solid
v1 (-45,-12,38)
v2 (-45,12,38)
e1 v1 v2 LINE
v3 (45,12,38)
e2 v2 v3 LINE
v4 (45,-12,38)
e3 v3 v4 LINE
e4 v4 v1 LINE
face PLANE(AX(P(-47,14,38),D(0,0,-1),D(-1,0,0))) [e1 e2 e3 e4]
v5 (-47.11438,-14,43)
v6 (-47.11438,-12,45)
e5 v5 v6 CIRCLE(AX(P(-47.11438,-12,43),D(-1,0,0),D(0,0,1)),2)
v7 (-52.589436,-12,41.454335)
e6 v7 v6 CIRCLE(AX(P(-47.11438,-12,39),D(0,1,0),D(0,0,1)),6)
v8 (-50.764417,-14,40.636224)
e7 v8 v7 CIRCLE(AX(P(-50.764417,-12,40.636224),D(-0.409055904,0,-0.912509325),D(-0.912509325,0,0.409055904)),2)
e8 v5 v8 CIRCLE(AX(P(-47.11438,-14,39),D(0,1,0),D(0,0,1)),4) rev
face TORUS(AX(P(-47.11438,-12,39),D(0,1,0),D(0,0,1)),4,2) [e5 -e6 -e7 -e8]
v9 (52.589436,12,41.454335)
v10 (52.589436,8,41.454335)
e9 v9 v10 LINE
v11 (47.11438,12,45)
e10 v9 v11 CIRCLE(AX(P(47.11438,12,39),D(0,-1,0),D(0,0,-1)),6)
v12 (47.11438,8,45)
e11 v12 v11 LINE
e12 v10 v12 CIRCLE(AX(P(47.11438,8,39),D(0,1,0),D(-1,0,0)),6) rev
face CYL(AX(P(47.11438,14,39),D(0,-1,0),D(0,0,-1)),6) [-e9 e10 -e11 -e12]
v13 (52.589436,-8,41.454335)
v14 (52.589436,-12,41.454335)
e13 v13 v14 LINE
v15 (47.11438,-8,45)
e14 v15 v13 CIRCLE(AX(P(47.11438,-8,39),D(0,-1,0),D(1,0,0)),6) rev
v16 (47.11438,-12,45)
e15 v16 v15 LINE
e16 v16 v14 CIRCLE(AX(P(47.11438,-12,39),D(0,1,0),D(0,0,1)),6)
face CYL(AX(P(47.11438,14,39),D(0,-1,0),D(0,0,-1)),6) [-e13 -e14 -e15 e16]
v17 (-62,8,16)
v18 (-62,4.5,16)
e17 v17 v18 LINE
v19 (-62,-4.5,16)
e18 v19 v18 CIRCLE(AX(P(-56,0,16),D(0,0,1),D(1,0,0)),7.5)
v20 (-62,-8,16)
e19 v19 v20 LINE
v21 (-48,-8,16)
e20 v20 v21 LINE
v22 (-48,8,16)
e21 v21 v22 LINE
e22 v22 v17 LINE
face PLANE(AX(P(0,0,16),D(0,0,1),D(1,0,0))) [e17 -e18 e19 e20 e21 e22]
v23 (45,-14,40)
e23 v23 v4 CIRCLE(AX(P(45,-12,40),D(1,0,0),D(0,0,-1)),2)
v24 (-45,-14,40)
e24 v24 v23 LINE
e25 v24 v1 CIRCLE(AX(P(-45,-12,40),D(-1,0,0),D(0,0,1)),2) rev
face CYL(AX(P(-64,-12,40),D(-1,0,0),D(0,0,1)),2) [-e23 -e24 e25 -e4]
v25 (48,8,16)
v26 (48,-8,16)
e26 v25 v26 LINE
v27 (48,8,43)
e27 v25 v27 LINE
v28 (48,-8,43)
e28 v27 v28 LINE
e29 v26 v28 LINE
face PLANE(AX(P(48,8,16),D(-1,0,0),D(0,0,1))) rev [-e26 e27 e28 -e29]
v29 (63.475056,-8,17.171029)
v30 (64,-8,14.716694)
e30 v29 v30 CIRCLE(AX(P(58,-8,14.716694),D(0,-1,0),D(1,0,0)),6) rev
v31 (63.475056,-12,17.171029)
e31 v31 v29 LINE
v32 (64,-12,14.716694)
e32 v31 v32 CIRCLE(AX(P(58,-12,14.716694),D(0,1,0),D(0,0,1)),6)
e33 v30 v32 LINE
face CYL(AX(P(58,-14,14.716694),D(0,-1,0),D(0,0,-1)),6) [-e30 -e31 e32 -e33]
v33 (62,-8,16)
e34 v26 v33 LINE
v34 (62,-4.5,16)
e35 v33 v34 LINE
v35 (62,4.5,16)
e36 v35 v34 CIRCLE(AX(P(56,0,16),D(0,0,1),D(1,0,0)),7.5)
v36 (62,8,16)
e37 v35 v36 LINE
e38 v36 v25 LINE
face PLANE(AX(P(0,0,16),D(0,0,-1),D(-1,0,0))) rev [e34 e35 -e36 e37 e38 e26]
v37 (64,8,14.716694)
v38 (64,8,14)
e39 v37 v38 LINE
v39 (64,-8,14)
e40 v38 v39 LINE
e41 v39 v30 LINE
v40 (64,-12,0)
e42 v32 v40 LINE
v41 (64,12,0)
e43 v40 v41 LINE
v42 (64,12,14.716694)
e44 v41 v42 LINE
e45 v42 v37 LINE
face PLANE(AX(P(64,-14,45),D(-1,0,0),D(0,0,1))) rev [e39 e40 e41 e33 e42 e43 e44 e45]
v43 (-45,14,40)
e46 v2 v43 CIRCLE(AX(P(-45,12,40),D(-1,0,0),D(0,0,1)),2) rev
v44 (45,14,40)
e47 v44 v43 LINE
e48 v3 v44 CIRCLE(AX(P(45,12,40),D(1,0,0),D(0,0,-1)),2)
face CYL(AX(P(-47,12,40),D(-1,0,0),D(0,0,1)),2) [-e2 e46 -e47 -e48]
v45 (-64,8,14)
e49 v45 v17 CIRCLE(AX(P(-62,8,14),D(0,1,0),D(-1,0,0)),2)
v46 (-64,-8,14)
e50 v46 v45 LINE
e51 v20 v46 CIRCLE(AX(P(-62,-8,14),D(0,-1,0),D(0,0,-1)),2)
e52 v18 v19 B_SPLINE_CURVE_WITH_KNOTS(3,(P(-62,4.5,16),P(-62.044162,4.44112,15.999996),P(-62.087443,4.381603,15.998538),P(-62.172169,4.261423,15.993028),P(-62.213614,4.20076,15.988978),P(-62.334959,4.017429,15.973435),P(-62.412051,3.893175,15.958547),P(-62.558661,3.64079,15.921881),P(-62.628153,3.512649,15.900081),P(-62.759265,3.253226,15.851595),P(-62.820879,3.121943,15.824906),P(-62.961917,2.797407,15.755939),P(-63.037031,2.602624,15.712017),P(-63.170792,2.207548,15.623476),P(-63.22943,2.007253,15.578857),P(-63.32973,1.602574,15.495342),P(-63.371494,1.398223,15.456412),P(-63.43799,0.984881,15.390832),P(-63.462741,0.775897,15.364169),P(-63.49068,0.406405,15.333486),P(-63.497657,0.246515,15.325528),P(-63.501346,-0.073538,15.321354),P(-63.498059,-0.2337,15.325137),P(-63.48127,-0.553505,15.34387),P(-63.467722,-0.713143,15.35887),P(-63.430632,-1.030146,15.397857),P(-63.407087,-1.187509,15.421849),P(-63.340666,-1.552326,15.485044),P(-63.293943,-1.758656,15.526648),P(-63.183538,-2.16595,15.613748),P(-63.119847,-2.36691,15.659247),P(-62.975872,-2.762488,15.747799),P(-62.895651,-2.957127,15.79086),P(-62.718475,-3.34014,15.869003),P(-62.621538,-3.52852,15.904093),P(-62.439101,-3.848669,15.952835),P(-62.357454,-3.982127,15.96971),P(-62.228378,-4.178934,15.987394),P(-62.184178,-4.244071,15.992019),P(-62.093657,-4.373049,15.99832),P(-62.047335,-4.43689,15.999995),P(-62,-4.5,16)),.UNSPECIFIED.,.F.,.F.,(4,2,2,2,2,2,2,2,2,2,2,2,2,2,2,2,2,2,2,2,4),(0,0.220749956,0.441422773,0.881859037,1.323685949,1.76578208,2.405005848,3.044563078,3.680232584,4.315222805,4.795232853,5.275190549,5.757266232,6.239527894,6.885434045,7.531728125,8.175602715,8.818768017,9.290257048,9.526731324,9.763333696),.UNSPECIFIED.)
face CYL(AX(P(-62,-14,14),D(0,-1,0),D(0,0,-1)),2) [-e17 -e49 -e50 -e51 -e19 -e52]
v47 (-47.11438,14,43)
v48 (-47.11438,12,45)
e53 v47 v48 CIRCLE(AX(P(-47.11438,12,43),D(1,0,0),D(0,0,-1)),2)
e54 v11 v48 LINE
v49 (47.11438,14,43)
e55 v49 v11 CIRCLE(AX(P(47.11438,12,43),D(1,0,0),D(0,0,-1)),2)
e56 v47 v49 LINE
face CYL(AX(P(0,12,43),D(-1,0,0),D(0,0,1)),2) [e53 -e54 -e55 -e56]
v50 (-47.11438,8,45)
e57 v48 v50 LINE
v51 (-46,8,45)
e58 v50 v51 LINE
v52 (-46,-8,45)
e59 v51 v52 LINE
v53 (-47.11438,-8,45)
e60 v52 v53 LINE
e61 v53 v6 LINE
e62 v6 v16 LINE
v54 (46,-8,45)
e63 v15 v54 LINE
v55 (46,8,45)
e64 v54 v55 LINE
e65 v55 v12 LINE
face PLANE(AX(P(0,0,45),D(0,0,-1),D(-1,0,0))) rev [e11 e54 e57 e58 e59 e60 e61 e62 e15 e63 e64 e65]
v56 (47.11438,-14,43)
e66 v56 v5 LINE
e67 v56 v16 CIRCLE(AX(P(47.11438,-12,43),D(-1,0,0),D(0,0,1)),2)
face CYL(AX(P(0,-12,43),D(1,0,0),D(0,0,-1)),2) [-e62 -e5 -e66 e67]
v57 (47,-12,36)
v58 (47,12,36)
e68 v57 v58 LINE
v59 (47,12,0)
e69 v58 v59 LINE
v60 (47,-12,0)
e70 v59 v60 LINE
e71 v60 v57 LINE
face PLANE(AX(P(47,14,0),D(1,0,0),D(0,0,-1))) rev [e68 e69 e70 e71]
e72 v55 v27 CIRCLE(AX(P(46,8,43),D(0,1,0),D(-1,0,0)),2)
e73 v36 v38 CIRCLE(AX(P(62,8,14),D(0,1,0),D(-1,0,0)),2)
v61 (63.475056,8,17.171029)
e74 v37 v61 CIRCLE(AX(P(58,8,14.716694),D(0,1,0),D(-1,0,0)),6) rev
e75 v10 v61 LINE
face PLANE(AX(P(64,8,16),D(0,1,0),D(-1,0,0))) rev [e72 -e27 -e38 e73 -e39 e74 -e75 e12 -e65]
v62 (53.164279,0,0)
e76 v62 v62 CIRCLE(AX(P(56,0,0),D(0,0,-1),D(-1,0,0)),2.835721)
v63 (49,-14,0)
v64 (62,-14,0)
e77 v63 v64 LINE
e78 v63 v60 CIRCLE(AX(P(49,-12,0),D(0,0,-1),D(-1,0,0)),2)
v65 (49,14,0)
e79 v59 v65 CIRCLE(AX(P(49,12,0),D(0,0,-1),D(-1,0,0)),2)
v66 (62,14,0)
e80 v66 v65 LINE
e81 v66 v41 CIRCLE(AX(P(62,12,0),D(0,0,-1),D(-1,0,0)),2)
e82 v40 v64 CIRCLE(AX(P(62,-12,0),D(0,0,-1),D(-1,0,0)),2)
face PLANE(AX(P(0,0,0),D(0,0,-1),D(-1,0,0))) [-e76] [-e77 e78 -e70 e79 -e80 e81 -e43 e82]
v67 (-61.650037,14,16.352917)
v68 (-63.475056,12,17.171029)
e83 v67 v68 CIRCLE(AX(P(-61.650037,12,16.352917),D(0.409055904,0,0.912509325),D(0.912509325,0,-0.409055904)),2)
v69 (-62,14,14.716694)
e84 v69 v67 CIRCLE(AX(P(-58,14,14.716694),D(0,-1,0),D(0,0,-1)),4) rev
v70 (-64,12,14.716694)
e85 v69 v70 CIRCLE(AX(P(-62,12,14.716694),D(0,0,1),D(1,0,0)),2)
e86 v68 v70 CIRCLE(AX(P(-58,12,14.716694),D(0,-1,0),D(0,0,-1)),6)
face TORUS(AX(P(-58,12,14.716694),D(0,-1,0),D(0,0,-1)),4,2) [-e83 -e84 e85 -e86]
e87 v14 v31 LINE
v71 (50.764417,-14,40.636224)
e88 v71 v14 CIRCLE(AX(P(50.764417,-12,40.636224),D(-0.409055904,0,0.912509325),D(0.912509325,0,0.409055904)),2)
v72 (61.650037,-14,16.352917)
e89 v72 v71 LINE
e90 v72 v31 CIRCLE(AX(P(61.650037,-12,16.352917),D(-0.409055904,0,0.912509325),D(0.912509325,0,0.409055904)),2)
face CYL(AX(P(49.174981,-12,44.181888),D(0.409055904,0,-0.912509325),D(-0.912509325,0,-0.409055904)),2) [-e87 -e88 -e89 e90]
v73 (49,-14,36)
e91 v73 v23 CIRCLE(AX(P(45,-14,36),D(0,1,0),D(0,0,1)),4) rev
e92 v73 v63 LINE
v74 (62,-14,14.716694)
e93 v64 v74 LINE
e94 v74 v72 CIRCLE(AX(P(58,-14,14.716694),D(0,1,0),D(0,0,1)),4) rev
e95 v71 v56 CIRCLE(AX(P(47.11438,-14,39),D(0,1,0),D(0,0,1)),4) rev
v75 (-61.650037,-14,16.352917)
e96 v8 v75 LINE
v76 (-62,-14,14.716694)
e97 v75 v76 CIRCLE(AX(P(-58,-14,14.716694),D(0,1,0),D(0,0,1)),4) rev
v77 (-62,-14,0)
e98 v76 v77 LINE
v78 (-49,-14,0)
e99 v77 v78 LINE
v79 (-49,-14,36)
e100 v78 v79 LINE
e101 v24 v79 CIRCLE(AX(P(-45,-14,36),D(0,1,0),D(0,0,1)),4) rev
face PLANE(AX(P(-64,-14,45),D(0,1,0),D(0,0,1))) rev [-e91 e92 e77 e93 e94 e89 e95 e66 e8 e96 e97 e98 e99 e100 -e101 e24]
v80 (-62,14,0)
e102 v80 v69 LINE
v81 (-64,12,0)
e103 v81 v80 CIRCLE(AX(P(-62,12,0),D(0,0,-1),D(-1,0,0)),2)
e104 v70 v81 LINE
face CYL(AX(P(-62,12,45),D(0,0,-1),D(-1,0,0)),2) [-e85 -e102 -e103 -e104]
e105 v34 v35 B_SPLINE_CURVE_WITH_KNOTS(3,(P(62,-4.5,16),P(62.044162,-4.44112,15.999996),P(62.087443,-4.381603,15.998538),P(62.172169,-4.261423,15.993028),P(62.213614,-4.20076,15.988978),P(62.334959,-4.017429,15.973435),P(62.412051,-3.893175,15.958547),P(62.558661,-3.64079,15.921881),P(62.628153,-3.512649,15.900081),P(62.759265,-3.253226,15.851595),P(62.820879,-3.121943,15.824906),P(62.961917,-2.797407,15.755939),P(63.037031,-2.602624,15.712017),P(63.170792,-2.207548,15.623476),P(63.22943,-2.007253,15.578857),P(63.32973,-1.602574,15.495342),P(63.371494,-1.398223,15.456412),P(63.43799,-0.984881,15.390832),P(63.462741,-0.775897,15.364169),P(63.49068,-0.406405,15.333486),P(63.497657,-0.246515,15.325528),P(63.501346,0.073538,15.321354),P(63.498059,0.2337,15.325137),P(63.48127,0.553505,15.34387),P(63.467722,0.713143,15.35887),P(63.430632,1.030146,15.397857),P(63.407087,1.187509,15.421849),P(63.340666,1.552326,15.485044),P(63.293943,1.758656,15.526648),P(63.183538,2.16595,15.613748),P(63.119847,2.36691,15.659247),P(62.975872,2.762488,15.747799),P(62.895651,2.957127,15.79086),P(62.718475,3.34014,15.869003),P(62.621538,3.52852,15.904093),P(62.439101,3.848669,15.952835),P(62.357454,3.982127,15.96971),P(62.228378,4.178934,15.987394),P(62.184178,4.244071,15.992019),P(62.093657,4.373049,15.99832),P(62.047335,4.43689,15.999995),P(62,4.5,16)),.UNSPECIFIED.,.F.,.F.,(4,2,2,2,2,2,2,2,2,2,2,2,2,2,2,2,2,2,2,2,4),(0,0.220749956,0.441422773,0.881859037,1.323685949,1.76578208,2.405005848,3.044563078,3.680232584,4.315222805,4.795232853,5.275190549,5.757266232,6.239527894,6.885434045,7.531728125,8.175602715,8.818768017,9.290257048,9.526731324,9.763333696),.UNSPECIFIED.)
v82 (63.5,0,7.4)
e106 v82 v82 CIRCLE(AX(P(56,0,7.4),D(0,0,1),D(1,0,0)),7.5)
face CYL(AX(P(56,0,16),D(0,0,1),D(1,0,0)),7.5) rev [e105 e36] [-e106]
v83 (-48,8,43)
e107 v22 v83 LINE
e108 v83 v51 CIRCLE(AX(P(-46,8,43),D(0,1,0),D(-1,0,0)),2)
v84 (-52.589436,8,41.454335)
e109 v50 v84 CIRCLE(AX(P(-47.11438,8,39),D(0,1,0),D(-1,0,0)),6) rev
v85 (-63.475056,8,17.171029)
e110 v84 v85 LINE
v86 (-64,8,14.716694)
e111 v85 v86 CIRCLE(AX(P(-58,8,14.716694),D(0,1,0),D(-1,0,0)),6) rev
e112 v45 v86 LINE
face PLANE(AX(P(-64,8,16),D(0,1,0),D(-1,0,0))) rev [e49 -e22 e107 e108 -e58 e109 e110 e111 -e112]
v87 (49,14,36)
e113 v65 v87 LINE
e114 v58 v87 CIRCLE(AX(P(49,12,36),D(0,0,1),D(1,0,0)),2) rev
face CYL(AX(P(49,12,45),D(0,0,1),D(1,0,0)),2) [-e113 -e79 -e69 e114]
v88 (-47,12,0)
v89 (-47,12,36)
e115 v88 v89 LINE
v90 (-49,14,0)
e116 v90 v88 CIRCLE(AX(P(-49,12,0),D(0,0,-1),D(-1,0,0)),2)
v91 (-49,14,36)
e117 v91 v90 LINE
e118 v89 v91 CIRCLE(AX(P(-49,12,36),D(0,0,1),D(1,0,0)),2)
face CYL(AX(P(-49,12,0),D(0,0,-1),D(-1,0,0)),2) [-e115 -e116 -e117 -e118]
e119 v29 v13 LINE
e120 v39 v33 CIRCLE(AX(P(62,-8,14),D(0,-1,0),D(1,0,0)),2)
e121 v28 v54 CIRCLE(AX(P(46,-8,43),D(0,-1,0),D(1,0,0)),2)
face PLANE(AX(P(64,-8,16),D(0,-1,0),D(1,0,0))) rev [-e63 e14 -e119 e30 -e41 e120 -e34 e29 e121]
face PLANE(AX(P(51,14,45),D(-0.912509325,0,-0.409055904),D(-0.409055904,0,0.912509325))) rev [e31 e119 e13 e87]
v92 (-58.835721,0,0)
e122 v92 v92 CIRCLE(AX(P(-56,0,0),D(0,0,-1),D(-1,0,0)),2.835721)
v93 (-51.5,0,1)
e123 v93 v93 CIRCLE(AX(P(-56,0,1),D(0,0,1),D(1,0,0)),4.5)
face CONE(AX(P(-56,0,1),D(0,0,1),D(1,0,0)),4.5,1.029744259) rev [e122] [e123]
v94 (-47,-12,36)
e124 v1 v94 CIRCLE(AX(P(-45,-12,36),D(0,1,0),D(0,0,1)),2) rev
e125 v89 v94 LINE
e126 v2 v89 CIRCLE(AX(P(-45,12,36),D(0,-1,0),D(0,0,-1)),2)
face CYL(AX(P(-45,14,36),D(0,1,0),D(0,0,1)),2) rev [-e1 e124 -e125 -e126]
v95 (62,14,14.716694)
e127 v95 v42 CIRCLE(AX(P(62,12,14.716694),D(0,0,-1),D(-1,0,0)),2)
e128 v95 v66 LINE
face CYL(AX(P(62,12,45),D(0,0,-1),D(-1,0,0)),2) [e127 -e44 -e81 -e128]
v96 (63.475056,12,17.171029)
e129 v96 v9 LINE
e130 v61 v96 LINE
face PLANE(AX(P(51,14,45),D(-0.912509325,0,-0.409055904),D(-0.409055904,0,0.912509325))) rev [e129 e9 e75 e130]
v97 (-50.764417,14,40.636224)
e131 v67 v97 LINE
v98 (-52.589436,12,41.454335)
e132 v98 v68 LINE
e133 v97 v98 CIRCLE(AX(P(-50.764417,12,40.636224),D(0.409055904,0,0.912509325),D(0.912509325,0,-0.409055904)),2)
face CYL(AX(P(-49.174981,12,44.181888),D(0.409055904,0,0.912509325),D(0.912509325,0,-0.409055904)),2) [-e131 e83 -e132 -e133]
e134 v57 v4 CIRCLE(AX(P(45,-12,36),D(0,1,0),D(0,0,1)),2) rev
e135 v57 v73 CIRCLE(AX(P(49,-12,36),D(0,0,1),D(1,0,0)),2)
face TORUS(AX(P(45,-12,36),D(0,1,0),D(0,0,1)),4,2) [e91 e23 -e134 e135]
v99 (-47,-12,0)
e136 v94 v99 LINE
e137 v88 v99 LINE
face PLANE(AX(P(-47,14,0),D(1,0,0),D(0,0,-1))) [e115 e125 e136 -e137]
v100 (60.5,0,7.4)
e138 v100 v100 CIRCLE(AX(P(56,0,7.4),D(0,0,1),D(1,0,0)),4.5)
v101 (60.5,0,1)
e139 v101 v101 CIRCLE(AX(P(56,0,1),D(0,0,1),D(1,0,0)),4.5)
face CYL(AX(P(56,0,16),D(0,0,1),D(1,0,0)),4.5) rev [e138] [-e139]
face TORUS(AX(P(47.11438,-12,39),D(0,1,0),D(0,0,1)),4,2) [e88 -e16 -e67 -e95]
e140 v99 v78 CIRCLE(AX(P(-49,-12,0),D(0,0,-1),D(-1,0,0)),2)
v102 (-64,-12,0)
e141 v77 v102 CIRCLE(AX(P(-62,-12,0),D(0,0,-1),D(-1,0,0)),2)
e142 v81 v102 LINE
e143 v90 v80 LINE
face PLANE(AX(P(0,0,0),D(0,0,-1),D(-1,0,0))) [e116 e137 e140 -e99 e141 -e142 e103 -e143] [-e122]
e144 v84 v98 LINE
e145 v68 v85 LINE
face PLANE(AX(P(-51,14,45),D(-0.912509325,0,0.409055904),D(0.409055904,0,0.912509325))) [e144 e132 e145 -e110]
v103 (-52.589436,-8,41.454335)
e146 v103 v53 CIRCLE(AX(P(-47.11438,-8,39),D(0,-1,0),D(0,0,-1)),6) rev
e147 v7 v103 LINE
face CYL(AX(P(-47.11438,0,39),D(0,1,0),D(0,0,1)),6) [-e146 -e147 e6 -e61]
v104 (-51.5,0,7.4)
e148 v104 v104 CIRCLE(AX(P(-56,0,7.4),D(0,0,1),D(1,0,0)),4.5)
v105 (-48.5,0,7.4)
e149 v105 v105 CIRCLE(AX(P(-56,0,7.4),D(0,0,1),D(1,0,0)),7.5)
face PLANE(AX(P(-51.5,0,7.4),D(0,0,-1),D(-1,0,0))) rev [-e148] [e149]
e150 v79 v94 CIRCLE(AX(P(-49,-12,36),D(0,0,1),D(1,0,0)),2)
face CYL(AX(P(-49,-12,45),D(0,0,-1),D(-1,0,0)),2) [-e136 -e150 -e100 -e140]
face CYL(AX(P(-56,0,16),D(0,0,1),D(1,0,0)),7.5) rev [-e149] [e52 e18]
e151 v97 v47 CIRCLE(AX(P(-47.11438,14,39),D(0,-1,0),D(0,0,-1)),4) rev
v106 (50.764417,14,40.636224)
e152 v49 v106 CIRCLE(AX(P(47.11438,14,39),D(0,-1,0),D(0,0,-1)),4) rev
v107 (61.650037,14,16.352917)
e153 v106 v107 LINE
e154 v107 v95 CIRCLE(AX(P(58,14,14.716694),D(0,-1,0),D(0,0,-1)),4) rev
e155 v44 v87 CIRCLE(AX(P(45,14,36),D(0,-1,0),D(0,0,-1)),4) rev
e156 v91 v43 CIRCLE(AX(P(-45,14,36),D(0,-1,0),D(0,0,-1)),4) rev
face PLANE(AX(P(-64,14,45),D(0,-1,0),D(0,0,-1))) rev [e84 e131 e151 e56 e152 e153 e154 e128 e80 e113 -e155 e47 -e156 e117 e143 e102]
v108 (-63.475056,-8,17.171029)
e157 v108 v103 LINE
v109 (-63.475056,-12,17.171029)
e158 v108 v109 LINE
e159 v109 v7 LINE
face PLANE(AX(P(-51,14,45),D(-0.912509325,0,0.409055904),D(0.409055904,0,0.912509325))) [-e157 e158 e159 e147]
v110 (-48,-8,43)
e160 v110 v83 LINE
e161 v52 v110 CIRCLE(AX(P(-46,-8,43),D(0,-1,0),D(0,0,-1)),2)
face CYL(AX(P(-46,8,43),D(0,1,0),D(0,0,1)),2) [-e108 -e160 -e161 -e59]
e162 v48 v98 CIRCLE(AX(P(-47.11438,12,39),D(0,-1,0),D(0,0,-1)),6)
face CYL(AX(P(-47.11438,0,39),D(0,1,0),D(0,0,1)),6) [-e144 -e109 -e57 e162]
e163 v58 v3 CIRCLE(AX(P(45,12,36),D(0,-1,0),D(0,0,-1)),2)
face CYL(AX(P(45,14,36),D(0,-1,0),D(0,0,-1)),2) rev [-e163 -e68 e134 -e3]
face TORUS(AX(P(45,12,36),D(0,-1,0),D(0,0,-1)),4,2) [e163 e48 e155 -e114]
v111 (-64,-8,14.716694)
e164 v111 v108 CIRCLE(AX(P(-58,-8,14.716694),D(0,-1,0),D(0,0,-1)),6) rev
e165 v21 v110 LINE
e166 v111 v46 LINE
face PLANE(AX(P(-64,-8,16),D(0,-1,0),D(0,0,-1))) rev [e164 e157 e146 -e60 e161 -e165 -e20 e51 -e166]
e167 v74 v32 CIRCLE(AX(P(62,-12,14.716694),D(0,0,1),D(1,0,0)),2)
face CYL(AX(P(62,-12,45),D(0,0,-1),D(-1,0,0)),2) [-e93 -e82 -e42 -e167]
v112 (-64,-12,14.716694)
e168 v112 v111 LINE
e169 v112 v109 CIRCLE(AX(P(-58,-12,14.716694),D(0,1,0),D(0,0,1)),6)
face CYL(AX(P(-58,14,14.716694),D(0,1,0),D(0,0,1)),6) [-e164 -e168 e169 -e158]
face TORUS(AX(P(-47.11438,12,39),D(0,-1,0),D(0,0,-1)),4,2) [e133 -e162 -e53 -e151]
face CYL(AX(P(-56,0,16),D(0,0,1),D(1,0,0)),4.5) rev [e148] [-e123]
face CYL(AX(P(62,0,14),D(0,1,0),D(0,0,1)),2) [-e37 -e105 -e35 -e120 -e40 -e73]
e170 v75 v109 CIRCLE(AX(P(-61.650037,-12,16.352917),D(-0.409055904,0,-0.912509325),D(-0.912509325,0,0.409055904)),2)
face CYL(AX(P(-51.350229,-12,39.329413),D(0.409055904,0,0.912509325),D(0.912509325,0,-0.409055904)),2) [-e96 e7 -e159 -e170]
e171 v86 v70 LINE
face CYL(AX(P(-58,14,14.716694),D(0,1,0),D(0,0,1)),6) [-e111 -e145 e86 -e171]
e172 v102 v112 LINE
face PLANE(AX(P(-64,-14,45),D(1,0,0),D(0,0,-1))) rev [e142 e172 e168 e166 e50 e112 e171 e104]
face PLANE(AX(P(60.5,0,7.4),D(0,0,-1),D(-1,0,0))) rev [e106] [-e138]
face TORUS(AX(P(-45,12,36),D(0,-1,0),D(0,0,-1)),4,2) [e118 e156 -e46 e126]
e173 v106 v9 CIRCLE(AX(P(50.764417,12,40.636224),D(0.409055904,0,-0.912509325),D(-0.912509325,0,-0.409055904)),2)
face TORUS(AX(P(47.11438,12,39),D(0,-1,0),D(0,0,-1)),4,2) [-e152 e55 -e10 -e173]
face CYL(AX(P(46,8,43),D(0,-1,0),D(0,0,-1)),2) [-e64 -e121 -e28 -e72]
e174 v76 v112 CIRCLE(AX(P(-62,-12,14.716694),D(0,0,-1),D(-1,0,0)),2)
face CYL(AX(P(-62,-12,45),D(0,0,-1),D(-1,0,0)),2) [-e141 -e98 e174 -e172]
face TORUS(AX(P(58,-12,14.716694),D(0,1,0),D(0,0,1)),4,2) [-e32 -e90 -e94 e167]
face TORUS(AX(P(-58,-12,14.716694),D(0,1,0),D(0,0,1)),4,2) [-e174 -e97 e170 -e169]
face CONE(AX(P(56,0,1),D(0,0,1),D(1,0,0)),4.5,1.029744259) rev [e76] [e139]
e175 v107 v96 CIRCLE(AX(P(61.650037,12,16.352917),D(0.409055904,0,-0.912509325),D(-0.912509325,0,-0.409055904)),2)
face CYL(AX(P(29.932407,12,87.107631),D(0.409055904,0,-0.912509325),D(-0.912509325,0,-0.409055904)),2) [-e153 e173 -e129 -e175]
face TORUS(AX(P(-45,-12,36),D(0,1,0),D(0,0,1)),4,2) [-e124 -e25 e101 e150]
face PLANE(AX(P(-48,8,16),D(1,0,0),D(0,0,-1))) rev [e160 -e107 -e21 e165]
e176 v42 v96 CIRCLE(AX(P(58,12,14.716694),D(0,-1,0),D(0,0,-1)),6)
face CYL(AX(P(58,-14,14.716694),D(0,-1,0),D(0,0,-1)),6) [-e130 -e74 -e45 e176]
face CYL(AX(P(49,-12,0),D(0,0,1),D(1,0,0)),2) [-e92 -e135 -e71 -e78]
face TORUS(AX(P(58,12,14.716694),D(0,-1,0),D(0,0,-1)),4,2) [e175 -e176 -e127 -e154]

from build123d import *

# Parameters (mm, degrees)
SKETCH1_W                                           = 128
SKETCH1_H                                           = 28
BOSS_EXTRUDE1_DEPTH                                 = 45
SKETCH2_OUTSIDE_W                                   = 157.708
SKETCH2_OUTSIDE_H                                   = 74.708
CUT_EXTRUDE2_DEPTH                                  = 84.096329642
FILLET1_R                                           = 6
FILLET2_R                                           = 2
SKETCH3_W                                           = 16
SKETCH3_H                                           = 16
CUT_EXTRUDE3_DEPTH                                  = 29
FILLET3_R                                           = 2
CBORE_FOR_M8_HEX_SOCKET_HEAD_CAP_SCREW1_D           = 9
CBORE_FOR_M8_HEX_SOCKET_HEAD_CAP_SCREW1_DEPTH       = 15
CBORE_FOR_M8_HEX_SOCKET_HEAD_CAP_SCREW1_CBORE_D     = 15
CBORE_FOR_M8_HEX_SOCKET_HEAD_CAP_SCREW1_CBORE_DEPTH = 8.6
CBORE_FOR_M8_HEX_SOCKET_HEAD_CAP_SCREW1_TIP         = 2.703872786


with BuildPart() as part:
    # Sketch1 → Boss-Extrude1 (new body)
    with BuildSketch(Plane.XY):
        Rectangle(SKETCH1_W, SKETCH1_H)
    extrude(amount=BOSS_EXTRUDE1_DEPTH)

    # Sketch2 outside → Cut-Extrude2 (cut, through all)
    with BuildSketch(Plane.XZ.offset(14)):
        with Locations((0, 22.5)):
            Rectangle(SKETCH2_OUTSIDE_W, SKETCH2_OUTSIDE_H)
        Polygon((-47, 0), (-47, 38), (47, 38), (47, 0), (64, 0), (64, 16), (51, 45), (-51, 45), (-64, 16), (-64, 0), align=None, mode=Mode.SUBTRACT)
    extrude(amount=-CUT_EXTRUDE2_DEPTH, mode=Mode.SUBTRACT)

    # Fillet1
    fillet1_edges = [part.edges().sort_by_distance(p)[0] for p in [
        (-64, 0, 16),
        (-51, 0, 45),
        (51, 0, 45),
        (64, 0, 16),
    ]]
    fillet(fillet1_edges, radius=FILLET1_R)

    # Fillet2
    fillet2_edges = [part.edges().sort_by_distance(p)[0] for p in [
        (-47, 14, 19),
        (0, 14, 38),
        (47, -14, 19),
        (47, 14, 19),
        (47, 0, 38),
        (0, -14, 38),
        (-47, 0, 38),
        (-47, -14, 19),
        (0, -14, 45),
        (0, 14, 45),
        (-58.032245896, -14, 29.312682233),
        (-64, -14, 7.358346808),
        (64, -14, 7.358346808),
        (58.032245896, -14, 29.312682233),
        (63.867296468, -14, 15.971616785),
        (50.375820334, -14, 44.036169802),
        (-63.867296468, -14, 15.971616785),
        (-50.375820334, -14, 44.036169802),
        (-58.032245896, 14, 29.312682233),
        (58.032245896, 14, 29.312682233),
        (64, 14, 7.358346808),
        (-64, 14, 7.358346808),
        (63.867296468, 14, 15.971616785),
        (50.375820334, 14, 44.036169802),
        (-63.867296468, 14, 15.971616785),
        (-50.375820334, 14, 44.036169802),
    ]]
    fillet(fillet2_edges, radius=FILLET2_R)

    # Sketch3 → Cut-Extrude3 (cut)
    with BuildSketch(Plane.XY.offset(45)):
        with Locations((-56, 0)):
            Rectangle(SKETCH3_W, SKETCH3_H)
        with Locations((56, 0)):
            Rectangle(SKETCH3_W, SKETCH3_H)
    extrude(amount=-CUT_EXTRUDE3_DEPTH, mode=Mode.SUBTRACT)

    # Fillet3
    # the kernel refuses this fillet: 2 mm, written as the material it takes off along each edge
    with BuildSketch(Plane(origin=(63.861153873, -8, 16), x_dir=(0.06925637128898768, 0, -0.9975988948650063), z_dir=(0, 1, 0))) as fillet3_piece_1:
        with BuildLine():
            CenterArc((1.866301026, 1.99519779), FILLET3_R, 183.971276773, 90)
            Line((-0.128896764, 1.856685047), (-0.328416543, 1.842833773))
            Line((-0.328416543, 1.842833773), (-0.199519779, -0.013851274))
            Line((-0.199519779, -0.013851274), (-0.029143426, -0.197865259))
            ThreePointArc((-0.029143426, -0.197865259), (1.303692283, -0.249155378), (2.018665043, -0.199519779))
            Line((2.018665043, -0.199519779), (2.004813769, 0))
        make_face()
    extrude(amount=16, mode=Mode.SUBTRACT)
    with BuildSketch(Plane(origin=(48, -8, 44.934279824), x_dir=(-0.999460544146637, 0, 0.032842361274859504), z_dir=(0, 1, 0))) as fillet3_piece_2:
        with BuildLine():
            CenterArc((1.935394771, -1.998921088), FILLET3_R, 88.117932867, 90)
            Line((-0.063526317, -1.933236366), (-0.263418426, -1.926667893))
            Line((-0.263418426, -1.926667893), (-0.199892109, 0.006568472))
            Line((-0.199892109, 0.006568472), (-0.02300822, 0.198672147))
            ThreePointArc((-0.02300822, 0.198672147), (0.893869228, 0.236490976), (2.007647966, 0.199892109))
            Line((2.007647966, 0.199892109), (2.001079494, 0))
        make_face()
    extrude(amount=16, mode=Mode.SUBTRACT)
    with BuildSketch(Plane(origin=(-63.861153873, -8, 16), x_dir=(-0.06925637128898415, 0, -0.9975988948650065), z_dir=(0, 1, 0))) as fillet3_piece_3:
        with BuildLine():
            CenterArc((1.866301026, -1.99519779), FILLET3_R, 86.028723227, 90)
            Line((-0.128896764, -1.856685047), (-0.328416543, -1.842833773))
            Line((-0.328416543, -1.842833773), (-0.199519779, 0.013851274))
            Line((-0.199519779, 0.013851274), (-0.029143426, 0.197865259))
            ThreePointArc((-0.029143426, 0.197865259), (1.303692283, 0.249155378), (2.018665043, 0.199519779))
            Line((2.018665043, 0.199519779), (2.004813769, 0))
        make_face()
    extrude(amount=16, mode=Mode.SUBTRACT)
    with BuildSketch(Plane(origin=(-48, -8, 44.934279824), x_dir=(0.999460544146637, 0, 0.032842361274859504), z_dir=(0, 1, 0))) as fillet3_piece_4:
        with BuildLine():
            CenterArc((1.935394771, 1.998921088), FILLET3_R, 181.882067133, 90)
            Line((-0.063526317, 1.933236366), (-0.263418426, 1.926667893))
            Line((-0.263418426, 1.926667893), (-0.199892109, -0.006568472))
            Line((-0.199892109, -0.006568472), (-0.02300822, -0.198672147))
            ThreePointArc((-0.02300822, -0.198672147), (0.893869228, -0.236490976), (2.007647966, -0.199892109))
            Line((2.007647966, -0.199892109), (2.001079494, 0))
        make_face()
    extrude(amount=16, mode=Mode.SUBTRACT)

    # CBORE for M8 Hex Socket Head Cap Screw1
    with Locations(Plane.XY.offset(16)):
        with Locations((-56, 0), (56, 0)):
            CounterBoreHole(CBORE_FOR_M8_HEX_SOCKET_HEAD_CAP_SCREW1_D / 2, CBORE_FOR_M8_HEX_SOCKET_HEAD_CAP_SCREW1_CBORE_D / 2, CBORE_FOR_M8_HEX_SOCKET_HEAD_CAP_SCREW1_CBORE_DEPTH, depth=CBORE_FOR_M8_HEX_SOCKET_HEAD_CAP_SCREW1_DEPTH)
            with Locations((0, 0, -(CBORE_FOR_M8_HEX_SOCKET_HEAD_CAP_SCREW1_DEPTH + CBORE_FOR_M8_HEX_SOCKET_HEAD_CAP_SCREW1_TIP / 2))):  # 118° drill point
                Cone(0, CBORE_FOR_M8_HEX_SOCKET_HEAD_CAP_SCREW1_D / 2, CBORE_FOR_M8_HEX_SOCKET_HEAD_CAP_SCREW1_TIP, mode=Mode.SUBTRACT)


solid = part.part
